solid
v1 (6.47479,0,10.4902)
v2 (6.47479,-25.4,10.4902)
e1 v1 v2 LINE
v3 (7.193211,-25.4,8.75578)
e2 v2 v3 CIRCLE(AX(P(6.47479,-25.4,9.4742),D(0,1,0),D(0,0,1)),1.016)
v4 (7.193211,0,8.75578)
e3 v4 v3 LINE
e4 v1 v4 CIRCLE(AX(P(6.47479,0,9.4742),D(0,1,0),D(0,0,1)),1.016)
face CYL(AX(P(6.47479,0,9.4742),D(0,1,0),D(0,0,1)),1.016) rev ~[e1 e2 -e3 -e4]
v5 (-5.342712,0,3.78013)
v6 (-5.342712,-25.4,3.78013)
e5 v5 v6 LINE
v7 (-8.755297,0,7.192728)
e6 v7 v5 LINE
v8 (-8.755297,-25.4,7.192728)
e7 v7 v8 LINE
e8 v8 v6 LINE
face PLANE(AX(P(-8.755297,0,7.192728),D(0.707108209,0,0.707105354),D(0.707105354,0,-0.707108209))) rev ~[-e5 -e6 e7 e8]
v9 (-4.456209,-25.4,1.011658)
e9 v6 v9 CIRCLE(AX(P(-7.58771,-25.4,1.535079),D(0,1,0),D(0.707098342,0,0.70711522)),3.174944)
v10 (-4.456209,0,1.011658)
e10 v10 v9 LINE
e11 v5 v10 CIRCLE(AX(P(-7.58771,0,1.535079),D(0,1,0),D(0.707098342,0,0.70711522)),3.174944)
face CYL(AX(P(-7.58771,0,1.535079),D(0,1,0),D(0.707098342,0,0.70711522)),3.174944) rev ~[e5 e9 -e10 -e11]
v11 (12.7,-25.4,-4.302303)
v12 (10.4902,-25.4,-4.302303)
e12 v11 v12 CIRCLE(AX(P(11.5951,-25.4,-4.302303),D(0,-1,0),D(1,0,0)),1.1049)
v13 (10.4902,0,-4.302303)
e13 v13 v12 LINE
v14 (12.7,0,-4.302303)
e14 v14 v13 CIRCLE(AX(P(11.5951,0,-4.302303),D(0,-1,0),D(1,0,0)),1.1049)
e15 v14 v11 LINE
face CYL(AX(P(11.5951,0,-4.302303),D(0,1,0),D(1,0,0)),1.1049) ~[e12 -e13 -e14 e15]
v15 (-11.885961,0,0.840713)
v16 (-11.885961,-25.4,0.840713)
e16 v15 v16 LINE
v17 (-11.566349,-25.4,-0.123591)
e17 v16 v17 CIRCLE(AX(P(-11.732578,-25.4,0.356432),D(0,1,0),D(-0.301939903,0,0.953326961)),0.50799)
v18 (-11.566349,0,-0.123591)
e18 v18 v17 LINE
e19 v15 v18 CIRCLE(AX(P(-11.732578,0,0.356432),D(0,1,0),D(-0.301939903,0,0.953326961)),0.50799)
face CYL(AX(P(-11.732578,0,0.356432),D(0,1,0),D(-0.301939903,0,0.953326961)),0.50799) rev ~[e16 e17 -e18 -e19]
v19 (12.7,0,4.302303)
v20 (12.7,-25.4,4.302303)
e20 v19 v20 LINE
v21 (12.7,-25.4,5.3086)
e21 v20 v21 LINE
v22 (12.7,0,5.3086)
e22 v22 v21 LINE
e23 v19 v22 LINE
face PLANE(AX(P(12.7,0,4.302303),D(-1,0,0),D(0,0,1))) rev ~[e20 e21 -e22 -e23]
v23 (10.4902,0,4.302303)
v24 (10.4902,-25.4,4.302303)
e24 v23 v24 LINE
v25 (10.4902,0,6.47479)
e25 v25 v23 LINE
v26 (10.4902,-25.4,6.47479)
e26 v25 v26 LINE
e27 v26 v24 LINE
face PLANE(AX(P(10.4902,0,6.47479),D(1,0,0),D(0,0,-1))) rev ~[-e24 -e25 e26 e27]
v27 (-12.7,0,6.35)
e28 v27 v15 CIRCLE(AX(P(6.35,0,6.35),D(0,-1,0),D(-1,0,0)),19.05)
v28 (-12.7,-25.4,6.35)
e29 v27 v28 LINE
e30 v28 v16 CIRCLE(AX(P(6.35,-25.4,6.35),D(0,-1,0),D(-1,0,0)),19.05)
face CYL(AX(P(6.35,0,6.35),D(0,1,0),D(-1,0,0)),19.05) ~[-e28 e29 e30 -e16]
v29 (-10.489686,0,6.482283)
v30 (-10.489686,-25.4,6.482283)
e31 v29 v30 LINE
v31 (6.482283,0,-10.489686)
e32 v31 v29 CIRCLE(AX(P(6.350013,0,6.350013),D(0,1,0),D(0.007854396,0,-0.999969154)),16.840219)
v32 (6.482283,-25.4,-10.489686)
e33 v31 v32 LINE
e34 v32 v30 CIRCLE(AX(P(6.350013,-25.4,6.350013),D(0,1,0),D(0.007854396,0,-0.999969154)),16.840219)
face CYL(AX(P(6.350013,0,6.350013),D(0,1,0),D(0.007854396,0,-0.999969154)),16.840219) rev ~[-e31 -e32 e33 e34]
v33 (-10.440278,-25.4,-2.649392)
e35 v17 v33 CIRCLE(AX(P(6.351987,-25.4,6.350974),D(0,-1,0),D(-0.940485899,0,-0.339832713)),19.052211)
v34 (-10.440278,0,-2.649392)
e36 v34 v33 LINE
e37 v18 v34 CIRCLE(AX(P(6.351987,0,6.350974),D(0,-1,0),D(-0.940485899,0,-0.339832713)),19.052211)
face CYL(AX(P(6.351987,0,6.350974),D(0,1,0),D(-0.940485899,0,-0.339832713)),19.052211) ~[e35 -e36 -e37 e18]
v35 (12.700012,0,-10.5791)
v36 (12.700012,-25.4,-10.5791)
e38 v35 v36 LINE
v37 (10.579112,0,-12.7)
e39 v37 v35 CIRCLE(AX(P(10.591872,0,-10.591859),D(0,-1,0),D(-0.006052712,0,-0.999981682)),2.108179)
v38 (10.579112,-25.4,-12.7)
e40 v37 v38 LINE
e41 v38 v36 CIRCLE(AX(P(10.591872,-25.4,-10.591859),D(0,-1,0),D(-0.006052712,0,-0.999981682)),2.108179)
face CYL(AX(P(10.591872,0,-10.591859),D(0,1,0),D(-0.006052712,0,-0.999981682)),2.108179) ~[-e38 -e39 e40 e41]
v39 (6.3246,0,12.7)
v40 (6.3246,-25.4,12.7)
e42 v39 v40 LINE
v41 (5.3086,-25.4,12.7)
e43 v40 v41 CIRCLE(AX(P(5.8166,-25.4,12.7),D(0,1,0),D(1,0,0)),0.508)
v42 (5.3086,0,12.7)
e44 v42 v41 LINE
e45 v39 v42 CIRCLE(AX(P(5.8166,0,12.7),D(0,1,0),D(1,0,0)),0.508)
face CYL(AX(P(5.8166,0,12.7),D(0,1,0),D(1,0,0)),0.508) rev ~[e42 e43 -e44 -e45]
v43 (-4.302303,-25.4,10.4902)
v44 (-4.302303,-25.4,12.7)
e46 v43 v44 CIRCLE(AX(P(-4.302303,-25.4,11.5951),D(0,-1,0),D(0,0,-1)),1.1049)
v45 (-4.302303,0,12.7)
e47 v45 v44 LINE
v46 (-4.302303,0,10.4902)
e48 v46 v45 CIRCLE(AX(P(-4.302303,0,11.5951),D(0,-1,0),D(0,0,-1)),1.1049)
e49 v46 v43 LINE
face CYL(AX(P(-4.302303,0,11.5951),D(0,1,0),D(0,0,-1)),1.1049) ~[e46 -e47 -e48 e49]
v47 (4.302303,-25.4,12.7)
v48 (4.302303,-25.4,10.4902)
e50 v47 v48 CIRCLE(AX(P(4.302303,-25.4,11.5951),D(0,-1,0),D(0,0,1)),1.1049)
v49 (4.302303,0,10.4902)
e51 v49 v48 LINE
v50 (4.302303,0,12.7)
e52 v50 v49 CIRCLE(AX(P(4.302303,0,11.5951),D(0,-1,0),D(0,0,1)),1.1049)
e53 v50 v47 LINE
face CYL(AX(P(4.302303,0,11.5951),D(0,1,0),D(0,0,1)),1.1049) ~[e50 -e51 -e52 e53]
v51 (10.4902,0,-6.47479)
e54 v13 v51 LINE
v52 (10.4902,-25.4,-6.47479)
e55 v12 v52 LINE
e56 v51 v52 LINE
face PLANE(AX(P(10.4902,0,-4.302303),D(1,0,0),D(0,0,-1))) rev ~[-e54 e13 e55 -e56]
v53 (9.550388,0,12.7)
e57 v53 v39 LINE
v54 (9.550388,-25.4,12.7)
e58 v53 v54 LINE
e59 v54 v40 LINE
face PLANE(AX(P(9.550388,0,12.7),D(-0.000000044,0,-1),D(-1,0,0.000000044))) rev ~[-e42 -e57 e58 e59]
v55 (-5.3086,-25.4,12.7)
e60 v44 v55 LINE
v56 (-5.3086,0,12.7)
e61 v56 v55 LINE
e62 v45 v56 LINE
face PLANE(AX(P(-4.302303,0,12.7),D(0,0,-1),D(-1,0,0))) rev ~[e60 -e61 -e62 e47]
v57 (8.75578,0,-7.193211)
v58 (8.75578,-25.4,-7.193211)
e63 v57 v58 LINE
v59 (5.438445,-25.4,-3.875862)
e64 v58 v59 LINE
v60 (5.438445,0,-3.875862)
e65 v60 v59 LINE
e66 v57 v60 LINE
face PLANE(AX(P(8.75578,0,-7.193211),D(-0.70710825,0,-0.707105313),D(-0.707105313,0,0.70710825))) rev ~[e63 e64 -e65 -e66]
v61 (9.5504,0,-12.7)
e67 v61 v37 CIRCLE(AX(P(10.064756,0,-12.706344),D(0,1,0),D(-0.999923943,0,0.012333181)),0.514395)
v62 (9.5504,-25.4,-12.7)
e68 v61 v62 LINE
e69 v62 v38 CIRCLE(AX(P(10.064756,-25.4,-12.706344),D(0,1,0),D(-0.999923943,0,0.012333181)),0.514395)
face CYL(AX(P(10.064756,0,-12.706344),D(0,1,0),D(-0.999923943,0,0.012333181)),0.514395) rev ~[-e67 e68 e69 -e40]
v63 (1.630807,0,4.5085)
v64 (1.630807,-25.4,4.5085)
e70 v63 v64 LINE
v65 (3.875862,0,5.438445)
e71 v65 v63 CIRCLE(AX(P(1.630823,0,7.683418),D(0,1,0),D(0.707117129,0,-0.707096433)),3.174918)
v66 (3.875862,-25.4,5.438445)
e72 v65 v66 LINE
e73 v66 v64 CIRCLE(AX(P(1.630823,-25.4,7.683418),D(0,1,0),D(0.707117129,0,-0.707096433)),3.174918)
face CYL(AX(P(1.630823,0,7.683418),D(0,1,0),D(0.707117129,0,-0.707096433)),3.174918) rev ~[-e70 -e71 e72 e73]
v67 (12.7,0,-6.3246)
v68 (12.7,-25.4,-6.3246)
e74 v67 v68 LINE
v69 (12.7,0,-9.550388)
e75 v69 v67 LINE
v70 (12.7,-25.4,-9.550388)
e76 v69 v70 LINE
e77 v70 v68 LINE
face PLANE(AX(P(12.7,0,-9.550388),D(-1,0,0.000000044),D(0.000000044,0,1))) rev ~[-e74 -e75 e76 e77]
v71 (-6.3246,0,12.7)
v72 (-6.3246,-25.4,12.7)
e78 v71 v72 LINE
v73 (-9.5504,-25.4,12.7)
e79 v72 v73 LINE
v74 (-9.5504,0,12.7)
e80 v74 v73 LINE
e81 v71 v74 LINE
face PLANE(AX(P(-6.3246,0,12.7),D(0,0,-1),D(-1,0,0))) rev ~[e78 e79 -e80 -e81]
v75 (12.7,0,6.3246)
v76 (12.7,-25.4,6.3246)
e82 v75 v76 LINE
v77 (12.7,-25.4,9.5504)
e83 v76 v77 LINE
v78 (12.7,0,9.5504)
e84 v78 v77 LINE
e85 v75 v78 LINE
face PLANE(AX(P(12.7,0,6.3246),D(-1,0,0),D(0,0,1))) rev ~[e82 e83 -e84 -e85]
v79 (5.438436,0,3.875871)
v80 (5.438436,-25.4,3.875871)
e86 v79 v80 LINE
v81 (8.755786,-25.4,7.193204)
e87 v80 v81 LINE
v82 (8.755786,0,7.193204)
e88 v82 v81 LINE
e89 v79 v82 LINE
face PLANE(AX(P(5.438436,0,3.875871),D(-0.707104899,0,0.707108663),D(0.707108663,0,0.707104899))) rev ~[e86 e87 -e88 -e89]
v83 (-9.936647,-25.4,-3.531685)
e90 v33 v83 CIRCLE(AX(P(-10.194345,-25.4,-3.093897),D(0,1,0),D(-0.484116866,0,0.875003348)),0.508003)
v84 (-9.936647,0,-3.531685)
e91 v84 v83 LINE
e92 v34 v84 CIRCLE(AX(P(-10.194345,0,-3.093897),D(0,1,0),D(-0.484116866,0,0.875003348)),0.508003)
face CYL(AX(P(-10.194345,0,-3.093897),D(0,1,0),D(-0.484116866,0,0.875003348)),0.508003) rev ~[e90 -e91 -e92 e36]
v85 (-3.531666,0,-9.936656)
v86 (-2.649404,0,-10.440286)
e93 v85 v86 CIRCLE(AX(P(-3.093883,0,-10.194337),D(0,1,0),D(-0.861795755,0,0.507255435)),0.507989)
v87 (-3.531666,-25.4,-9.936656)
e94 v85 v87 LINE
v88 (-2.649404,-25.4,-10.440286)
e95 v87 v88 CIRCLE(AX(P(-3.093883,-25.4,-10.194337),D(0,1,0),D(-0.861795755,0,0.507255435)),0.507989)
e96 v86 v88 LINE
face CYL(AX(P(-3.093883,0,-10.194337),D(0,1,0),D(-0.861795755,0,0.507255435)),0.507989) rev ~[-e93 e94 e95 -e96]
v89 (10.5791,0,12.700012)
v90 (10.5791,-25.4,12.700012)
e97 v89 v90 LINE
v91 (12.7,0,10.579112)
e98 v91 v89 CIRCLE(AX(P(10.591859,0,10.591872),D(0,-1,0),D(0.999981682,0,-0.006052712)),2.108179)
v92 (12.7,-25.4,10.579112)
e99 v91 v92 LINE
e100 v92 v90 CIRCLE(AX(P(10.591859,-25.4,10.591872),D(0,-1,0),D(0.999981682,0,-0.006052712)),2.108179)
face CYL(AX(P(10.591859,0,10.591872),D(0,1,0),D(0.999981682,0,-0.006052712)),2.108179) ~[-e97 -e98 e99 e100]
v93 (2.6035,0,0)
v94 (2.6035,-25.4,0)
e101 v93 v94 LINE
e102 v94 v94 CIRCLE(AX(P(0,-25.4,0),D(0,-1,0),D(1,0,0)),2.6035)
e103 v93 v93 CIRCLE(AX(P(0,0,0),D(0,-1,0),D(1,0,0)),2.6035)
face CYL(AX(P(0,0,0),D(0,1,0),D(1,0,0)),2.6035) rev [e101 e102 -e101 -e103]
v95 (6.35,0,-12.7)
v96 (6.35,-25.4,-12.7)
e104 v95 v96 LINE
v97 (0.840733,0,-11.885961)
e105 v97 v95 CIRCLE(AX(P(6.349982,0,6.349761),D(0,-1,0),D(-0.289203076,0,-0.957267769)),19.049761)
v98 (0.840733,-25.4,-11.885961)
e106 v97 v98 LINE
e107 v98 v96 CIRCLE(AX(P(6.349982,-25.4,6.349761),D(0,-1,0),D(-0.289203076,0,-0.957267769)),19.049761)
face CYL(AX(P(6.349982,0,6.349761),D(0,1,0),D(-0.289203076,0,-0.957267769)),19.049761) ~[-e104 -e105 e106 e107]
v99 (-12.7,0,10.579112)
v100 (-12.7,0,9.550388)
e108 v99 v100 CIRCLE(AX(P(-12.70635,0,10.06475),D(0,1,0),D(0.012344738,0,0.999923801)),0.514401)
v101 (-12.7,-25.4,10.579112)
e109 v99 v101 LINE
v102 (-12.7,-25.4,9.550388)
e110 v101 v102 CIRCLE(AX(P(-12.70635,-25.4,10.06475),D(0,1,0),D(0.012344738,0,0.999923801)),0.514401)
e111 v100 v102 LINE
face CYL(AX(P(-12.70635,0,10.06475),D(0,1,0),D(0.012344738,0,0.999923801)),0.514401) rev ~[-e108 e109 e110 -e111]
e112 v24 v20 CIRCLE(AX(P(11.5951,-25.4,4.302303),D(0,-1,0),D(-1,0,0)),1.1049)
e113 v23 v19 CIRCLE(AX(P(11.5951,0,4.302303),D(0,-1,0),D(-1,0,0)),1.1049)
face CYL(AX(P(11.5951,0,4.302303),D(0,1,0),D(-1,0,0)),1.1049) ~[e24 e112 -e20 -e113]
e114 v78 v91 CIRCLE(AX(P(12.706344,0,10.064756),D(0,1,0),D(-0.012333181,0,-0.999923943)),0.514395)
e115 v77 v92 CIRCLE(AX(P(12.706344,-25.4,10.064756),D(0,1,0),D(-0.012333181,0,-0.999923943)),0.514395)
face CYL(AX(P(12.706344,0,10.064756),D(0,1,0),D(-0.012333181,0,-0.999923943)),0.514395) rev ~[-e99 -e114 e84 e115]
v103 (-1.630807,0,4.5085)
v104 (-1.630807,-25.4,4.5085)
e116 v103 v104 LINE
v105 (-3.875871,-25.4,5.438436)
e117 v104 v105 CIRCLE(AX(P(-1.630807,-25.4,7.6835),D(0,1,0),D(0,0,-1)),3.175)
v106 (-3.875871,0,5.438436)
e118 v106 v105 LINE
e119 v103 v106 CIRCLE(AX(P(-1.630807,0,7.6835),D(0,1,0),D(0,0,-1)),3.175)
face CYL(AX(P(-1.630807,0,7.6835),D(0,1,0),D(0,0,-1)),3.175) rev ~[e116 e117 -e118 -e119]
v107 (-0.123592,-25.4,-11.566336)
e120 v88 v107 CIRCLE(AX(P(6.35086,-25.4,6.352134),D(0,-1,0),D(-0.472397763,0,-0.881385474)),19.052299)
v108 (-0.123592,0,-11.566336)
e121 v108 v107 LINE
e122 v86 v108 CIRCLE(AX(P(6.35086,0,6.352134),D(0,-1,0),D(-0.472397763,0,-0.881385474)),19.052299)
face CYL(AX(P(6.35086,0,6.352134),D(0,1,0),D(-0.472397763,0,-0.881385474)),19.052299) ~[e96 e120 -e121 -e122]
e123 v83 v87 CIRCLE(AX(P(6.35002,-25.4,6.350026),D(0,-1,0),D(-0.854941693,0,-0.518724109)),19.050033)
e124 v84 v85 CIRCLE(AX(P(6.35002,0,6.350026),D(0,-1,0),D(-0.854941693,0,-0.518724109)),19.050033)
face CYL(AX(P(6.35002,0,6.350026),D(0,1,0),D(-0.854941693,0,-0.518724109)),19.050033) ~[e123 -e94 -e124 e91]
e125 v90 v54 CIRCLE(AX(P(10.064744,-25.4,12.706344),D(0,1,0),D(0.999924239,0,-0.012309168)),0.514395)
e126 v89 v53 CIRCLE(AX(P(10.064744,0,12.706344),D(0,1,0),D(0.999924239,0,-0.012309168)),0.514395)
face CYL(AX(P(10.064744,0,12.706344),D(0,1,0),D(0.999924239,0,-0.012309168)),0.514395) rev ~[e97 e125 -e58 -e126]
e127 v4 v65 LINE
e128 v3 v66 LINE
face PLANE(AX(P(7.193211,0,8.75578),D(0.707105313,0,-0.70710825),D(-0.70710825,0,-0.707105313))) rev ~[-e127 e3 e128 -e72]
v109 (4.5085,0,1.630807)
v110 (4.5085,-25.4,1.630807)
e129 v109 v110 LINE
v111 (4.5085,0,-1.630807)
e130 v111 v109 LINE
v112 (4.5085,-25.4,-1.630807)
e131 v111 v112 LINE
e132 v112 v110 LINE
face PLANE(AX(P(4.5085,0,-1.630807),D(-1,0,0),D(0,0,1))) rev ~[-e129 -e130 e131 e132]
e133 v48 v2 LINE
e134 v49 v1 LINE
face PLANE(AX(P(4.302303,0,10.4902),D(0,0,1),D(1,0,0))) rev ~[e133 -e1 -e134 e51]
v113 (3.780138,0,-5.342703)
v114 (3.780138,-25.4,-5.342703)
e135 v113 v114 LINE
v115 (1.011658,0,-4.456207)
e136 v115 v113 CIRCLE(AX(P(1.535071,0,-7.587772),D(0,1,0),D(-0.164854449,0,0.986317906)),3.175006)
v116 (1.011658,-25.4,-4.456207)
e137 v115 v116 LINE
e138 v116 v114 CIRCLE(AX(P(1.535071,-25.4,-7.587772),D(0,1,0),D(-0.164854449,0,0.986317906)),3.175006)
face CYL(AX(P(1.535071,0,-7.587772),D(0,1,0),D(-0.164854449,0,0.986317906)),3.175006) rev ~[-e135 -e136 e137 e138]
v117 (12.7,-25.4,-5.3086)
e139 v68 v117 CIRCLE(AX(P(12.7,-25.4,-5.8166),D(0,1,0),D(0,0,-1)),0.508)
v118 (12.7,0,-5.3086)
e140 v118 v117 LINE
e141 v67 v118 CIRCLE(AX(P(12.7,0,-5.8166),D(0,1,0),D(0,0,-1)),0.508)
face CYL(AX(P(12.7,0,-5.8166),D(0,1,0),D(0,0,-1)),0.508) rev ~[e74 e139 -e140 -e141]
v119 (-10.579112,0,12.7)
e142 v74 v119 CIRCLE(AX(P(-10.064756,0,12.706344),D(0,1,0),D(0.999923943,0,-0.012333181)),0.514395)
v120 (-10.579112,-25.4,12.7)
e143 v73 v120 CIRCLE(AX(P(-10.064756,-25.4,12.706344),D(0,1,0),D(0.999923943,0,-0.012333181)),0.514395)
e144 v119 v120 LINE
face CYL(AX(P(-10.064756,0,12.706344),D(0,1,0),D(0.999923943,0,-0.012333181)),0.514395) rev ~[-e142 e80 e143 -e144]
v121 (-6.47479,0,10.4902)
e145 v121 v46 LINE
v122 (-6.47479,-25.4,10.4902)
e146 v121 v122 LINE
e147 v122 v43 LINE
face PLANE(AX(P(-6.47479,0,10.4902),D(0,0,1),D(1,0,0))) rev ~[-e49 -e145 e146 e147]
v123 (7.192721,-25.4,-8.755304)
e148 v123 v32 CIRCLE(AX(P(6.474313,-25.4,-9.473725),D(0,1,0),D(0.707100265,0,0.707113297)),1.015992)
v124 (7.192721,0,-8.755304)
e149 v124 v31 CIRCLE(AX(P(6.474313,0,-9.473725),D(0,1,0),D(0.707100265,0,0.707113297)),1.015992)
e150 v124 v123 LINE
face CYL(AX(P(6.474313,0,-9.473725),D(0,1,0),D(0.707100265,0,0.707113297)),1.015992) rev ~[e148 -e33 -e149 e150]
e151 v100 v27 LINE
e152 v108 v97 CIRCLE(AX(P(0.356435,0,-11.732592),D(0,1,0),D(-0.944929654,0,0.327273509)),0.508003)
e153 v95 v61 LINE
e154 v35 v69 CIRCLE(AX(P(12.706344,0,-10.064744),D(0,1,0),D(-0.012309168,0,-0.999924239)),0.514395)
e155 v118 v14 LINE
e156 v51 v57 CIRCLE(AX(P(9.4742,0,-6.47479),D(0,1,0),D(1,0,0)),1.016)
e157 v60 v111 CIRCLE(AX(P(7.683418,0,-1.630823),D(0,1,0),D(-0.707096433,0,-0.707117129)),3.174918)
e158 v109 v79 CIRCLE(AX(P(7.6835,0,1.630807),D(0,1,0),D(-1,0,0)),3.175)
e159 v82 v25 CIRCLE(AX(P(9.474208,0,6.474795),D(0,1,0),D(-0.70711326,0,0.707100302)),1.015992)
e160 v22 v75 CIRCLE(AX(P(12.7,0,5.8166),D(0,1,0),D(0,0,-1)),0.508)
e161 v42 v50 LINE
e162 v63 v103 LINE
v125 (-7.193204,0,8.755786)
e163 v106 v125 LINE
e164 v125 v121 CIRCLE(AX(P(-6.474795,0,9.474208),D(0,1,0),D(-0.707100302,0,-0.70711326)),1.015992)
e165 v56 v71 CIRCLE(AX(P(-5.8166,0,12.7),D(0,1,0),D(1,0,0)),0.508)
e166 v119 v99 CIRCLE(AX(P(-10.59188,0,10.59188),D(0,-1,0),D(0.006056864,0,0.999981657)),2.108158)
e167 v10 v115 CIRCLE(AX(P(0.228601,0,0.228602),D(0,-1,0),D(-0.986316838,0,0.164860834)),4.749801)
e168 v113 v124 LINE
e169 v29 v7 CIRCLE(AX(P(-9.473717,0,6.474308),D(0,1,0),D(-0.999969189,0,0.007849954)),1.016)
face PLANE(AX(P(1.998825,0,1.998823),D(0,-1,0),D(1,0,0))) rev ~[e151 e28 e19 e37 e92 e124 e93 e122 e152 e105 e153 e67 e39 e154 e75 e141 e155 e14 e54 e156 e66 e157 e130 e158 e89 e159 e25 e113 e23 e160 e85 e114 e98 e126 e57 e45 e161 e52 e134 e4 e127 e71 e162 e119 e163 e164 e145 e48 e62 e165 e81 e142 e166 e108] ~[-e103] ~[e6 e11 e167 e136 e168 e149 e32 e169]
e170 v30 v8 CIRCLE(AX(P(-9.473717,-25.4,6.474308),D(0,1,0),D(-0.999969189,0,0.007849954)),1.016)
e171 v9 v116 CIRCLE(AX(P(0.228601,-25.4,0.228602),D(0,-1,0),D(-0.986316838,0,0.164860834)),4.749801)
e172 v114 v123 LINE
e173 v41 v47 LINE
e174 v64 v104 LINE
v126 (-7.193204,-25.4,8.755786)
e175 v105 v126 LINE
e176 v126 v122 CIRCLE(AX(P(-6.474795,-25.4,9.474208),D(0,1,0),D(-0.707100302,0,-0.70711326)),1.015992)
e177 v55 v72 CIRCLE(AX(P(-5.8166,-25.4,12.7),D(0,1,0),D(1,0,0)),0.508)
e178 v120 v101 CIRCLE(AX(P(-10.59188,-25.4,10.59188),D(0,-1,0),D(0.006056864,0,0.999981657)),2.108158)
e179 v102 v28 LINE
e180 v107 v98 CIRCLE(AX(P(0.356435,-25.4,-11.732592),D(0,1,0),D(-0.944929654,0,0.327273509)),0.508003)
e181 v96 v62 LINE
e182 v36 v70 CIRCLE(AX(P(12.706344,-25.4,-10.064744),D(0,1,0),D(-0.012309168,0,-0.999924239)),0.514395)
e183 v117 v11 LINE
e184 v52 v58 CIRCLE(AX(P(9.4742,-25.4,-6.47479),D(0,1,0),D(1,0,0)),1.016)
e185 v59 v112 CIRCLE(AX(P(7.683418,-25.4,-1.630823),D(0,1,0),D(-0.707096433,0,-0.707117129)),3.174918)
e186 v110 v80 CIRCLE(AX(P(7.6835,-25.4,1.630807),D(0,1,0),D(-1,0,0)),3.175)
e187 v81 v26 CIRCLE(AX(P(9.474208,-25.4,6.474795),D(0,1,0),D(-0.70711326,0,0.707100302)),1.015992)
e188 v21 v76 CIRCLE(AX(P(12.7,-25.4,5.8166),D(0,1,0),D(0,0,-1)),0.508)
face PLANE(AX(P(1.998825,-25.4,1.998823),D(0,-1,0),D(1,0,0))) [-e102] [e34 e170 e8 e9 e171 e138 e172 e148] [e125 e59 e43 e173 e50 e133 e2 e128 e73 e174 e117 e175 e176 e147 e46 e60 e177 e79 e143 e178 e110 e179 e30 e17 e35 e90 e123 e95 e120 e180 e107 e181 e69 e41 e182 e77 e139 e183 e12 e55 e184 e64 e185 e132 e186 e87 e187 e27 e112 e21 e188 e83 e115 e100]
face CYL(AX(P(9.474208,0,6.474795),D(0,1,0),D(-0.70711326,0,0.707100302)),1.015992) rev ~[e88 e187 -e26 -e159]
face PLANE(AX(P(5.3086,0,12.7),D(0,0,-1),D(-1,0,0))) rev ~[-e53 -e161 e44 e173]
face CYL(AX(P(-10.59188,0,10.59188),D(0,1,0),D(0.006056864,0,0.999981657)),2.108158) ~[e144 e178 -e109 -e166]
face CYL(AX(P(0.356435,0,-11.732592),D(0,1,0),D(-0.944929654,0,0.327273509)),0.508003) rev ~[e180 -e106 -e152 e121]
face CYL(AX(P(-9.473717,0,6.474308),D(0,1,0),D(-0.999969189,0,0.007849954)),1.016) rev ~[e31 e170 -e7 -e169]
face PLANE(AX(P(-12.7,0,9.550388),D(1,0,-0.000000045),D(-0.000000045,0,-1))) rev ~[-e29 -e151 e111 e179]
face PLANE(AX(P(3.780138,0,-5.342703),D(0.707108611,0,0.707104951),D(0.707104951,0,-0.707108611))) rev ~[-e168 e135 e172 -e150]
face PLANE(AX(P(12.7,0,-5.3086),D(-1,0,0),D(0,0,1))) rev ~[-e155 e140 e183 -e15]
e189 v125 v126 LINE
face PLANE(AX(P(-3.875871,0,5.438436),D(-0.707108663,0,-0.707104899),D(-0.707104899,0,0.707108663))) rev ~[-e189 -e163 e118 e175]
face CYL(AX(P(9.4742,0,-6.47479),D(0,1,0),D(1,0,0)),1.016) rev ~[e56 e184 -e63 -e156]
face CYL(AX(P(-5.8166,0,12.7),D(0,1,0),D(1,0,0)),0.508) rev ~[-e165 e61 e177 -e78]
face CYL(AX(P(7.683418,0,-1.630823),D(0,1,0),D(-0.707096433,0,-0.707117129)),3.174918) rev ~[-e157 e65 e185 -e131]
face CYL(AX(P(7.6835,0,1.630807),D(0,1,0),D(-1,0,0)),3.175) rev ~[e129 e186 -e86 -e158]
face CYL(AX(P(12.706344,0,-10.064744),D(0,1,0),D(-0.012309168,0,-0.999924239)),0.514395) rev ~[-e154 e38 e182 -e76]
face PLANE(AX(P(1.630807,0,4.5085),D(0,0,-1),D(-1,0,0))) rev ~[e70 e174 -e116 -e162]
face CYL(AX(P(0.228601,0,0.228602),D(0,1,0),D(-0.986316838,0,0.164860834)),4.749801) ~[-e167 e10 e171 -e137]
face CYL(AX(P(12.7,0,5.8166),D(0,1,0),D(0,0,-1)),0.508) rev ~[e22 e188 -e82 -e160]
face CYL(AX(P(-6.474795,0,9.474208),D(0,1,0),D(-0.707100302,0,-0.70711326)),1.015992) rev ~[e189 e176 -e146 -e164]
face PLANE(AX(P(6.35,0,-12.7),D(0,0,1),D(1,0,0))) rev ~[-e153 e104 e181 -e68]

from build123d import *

# Parameters (mm, degrees)
F0_R     = 2.6035
F1_DEPTH = 25.4


# Not quite as in the source:
# - ends of sketch curves that miss each other by under 0.0002 mm in the source are joined


with BuildPart() as f1:
    # F0 (on Front) → F1 (new body)
    with BuildSketch(Plane.XZ):
        with BuildLine():
            ThreePointArc((-12.6999998568, 10.5791116031), (-12.1919492, 10.06475), (-12.6999998568, 9.5503883969))
            Line((-12.6999998568, 9.5503883969), (-12.7, 6.35))
            ThreePointArc((-12.7, 6.35), (-12.4953913266, 3.565448735), (-11.8859605514, 0.8407130437))
            ThreePointArc((-11.8859605514, 0.8407130437), (-11.2503853868, 0.5162584682), (-11.5663491172, -0.1235908641))
            ThreePointArc((-11.5663491172, -0.1235908641), (-11.0492007439, -1.4069525893), (-10.4402782322, -2.6493920286))
            ThreePointArc((-10.4402782322, -2.6493920286), (-9.7531608674, -2.84205605), (-9.9366469283, -3.5316852695))
            ThreePointArc((-9.9366469283, -3.5316852695), (-7.1203841816, -7.1203841816), (-3.5316659689, -9.9366564303))
            ThreePointArc((-3.5316659689, -9.9366564303), (-2.84205605, -9.7531608674), (-2.6494036278, -10.4402857754))
            ThreePointArc((-2.6494036278, -10.4402857754), (-1.4069525893, -11.0492007439), (-0.1235924101, -11.5663361575))
            ThreePointArc((-0.1235924101, -11.5663361575), (0.5162584682, -11.2503853868), (0.8407328825, -11.8859611899))
            ThreePointArc((0.8407328825, -11.8859611899), (3.565448735, -12.4953913266), (6.35, -12.7))
            Line((6.35, -12.7), (9.5504, -12.7))
            ThreePointArc((9.5504, -12.7), (10.06475, -12.1919492), (10.5791116031, -12.6999998568))
            ThreePointArc((10.5791116031, -12.6999998568), (12.0825733161, -12.0825733161), (12.7000122396, -10.579099926))
            ThreePointArc((12.7000122396, -10.579099926), (12.1919492, -10.06475), (12.6999998568, -9.5503883969))
            Line((12.6999998568, -9.5503883969), (12.7, -6.3246))
            ThreePointArc((12.7, -6.3246), (12.192, -5.8166), (12.7, -5.3086))
            Line((12.7, -5.3086), (12.7, -4.3023028))
            ThreePointArc((12.7, -4.3023028), (11.5951, -3.1974028), (10.4902, -4.3023028))
            Line((10.4902, -4.3023028), (10.4902, -6.4747902))
            ThreePointArc((10.4902, -6.4747902), (9.8630063673, -7.413451805), (8.7557795103, -7.1932106897))
            Line((8.7557795103, -7.1932106897), (5.4384448, -3.8758622))
            ThreePointArc((5.4384448, -3.8758622), (4.7501824843, -2.8458268978), (4.5085, -1.630807))
            Line((4.5085, -1.630807), (4.5085, 1.630807))
            ThreePointArc((4.5085, 1.630807), (4.7501824843, 2.8458268978), (5.4384359697, 3.8758710303))
            Line((5.4384359697, 3.8758710303), (8.7557864, 7.1932038))
            ThreePointArc((8.7557864, 7.1932038), (9.8630063673, 7.413451805), (10.4902, 6.4747902))
            Line((10.4902, 6.4747902), (10.4902, 4.3023028))
            ThreePointArc((10.4902, 4.3023028), (11.5951, 3.1974028), (12.7, 4.3023028))
            Line((12.7, 4.3023028), (12.7, 5.3086))
            ThreePointArc((12.7, 5.3086), (12.192, 5.8166), (12.7, 6.3246))
            Line((12.7, 6.3246), (12.7, 9.5504))
            ThreePointArc((12.7, 9.5504), (12.1919492, 10.06475), (12.6999998568, 10.5791116031))
            ThreePointArc((12.6999998568, 10.5791116031), (12.0825733161, 12.0825733161), (10.579099926, 12.7000122396))
            ThreePointArc((10.579099926, 12.7000122396), (10.06475, 12.1919492), (9.5503883969, 12.6999998568))
            Line((9.5503883969, 12.6999998568), (6.3246, 12.7))
            ThreePointArc((6.3246, 12.7), (5.8166, 12.192), (5.3086, 12.7))
            Line((5.3086, 12.7), (4.3023028, 12.7))
            ThreePointArc((4.3023028, 12.7), (3.1974028, 11.5951), (4.3023028, 10.4902))
            Line((4.3023028, 10.4902), (6.4747902, 10.4902))
            ThreePointArc((6.4747902, 10.4902), (7.413451805, 9.8630063673), (7.1932106897, 8.7557795103))
            Line((7.1932106897, 8.7557795103), (3.8758622, 5.4384448))
            ThreePointArc((3.8758622, 5.4384448), (2.8458268978, 4.7501824843), (1.630807, 4.5085))
            Line((1.630807, 4.5085), (-1.630807, 4.5085))
            ThreePointArc((-1.630807, 4.5085), (-2.8458268978, 4.7501824843), (-3.8758710303, 5.4384359697))
            Line((-3.8758710303, 5.4384359697), (-7.1932038, 8.7557864))
            ThreePointArc((-7.1932038, 8.7557864), (-7.413451805, 9.8630063673), (-6.4747902, 10.4902))
            Line((-6.4747902, 10.4902), (-4.3023028, 10.4902))
            ThreePointArc((-4.3023028, 10.4902), (-3.1974028, 11.5951), (-4.3023028, 12.7))
            Line((-4.3023028, 12.7), (-5.3086, 12.7))
            ThreePointArc((-5.3086, 12.7), (-5.8166, 12.192), (-6.3246, 12.7))
            Line((-6.3246, 12.7), (-9.5504, 12.7))
            ThreePointArc((-9.5504, 12.7), (-10.06475, 12.1919492), (-10.5791116031, 12.6999998568))
            ThreePointArc((-10.5791116031, 12.6999998568), (-12.0825733161, 12.0825733161), (-12.6999998568, 10.5791116031))
        make_face()
        with BuildLine():
            ThreePointArc((-10.4896860957, 6.4822831536), (-9.8588365186, 7.4144880425), (-8.7552969103, 7.1927280897))
            Line((-8.7552969103, 7.1927280897), (-5.3427122, 3.7801296))
            ThreePointArc((-5.3427122, 3.7801296), (-4.5640049581, 2.5033128493), (-4.4562086701, 1.0116578151))
            ThreePointArc((-4.4562086701, 1.0116578151), (-3.1300157893, -3.1300157893), (1.0116576108, -4.4562074473))
            ThreePointArc((1.0116576108, -4.4562074473), (2.5033128493, -4.5640049581), (3.7801384303, -5.3427033697))
            Line((3.7801384303, -5.3427033697), (7.1927212, -8.7553038))
            ThreePointArc((7.1927212, -8.7553038), (7.4144880425, -9.8588365186), (6.4822831536, -10.4896860957))
            ThreePointArc((6.4822831536, -10.4896860957), (-5.5578196165, -5.5578196165), (-10.4896860957, 6.4822831536))
        make_face(mode=Mode.SUBTRACT)
        Circle(F0_R, mode=Mode.SUBTRACT)
    extrude(amount=F1_DEPTH)


solid = f1.part
